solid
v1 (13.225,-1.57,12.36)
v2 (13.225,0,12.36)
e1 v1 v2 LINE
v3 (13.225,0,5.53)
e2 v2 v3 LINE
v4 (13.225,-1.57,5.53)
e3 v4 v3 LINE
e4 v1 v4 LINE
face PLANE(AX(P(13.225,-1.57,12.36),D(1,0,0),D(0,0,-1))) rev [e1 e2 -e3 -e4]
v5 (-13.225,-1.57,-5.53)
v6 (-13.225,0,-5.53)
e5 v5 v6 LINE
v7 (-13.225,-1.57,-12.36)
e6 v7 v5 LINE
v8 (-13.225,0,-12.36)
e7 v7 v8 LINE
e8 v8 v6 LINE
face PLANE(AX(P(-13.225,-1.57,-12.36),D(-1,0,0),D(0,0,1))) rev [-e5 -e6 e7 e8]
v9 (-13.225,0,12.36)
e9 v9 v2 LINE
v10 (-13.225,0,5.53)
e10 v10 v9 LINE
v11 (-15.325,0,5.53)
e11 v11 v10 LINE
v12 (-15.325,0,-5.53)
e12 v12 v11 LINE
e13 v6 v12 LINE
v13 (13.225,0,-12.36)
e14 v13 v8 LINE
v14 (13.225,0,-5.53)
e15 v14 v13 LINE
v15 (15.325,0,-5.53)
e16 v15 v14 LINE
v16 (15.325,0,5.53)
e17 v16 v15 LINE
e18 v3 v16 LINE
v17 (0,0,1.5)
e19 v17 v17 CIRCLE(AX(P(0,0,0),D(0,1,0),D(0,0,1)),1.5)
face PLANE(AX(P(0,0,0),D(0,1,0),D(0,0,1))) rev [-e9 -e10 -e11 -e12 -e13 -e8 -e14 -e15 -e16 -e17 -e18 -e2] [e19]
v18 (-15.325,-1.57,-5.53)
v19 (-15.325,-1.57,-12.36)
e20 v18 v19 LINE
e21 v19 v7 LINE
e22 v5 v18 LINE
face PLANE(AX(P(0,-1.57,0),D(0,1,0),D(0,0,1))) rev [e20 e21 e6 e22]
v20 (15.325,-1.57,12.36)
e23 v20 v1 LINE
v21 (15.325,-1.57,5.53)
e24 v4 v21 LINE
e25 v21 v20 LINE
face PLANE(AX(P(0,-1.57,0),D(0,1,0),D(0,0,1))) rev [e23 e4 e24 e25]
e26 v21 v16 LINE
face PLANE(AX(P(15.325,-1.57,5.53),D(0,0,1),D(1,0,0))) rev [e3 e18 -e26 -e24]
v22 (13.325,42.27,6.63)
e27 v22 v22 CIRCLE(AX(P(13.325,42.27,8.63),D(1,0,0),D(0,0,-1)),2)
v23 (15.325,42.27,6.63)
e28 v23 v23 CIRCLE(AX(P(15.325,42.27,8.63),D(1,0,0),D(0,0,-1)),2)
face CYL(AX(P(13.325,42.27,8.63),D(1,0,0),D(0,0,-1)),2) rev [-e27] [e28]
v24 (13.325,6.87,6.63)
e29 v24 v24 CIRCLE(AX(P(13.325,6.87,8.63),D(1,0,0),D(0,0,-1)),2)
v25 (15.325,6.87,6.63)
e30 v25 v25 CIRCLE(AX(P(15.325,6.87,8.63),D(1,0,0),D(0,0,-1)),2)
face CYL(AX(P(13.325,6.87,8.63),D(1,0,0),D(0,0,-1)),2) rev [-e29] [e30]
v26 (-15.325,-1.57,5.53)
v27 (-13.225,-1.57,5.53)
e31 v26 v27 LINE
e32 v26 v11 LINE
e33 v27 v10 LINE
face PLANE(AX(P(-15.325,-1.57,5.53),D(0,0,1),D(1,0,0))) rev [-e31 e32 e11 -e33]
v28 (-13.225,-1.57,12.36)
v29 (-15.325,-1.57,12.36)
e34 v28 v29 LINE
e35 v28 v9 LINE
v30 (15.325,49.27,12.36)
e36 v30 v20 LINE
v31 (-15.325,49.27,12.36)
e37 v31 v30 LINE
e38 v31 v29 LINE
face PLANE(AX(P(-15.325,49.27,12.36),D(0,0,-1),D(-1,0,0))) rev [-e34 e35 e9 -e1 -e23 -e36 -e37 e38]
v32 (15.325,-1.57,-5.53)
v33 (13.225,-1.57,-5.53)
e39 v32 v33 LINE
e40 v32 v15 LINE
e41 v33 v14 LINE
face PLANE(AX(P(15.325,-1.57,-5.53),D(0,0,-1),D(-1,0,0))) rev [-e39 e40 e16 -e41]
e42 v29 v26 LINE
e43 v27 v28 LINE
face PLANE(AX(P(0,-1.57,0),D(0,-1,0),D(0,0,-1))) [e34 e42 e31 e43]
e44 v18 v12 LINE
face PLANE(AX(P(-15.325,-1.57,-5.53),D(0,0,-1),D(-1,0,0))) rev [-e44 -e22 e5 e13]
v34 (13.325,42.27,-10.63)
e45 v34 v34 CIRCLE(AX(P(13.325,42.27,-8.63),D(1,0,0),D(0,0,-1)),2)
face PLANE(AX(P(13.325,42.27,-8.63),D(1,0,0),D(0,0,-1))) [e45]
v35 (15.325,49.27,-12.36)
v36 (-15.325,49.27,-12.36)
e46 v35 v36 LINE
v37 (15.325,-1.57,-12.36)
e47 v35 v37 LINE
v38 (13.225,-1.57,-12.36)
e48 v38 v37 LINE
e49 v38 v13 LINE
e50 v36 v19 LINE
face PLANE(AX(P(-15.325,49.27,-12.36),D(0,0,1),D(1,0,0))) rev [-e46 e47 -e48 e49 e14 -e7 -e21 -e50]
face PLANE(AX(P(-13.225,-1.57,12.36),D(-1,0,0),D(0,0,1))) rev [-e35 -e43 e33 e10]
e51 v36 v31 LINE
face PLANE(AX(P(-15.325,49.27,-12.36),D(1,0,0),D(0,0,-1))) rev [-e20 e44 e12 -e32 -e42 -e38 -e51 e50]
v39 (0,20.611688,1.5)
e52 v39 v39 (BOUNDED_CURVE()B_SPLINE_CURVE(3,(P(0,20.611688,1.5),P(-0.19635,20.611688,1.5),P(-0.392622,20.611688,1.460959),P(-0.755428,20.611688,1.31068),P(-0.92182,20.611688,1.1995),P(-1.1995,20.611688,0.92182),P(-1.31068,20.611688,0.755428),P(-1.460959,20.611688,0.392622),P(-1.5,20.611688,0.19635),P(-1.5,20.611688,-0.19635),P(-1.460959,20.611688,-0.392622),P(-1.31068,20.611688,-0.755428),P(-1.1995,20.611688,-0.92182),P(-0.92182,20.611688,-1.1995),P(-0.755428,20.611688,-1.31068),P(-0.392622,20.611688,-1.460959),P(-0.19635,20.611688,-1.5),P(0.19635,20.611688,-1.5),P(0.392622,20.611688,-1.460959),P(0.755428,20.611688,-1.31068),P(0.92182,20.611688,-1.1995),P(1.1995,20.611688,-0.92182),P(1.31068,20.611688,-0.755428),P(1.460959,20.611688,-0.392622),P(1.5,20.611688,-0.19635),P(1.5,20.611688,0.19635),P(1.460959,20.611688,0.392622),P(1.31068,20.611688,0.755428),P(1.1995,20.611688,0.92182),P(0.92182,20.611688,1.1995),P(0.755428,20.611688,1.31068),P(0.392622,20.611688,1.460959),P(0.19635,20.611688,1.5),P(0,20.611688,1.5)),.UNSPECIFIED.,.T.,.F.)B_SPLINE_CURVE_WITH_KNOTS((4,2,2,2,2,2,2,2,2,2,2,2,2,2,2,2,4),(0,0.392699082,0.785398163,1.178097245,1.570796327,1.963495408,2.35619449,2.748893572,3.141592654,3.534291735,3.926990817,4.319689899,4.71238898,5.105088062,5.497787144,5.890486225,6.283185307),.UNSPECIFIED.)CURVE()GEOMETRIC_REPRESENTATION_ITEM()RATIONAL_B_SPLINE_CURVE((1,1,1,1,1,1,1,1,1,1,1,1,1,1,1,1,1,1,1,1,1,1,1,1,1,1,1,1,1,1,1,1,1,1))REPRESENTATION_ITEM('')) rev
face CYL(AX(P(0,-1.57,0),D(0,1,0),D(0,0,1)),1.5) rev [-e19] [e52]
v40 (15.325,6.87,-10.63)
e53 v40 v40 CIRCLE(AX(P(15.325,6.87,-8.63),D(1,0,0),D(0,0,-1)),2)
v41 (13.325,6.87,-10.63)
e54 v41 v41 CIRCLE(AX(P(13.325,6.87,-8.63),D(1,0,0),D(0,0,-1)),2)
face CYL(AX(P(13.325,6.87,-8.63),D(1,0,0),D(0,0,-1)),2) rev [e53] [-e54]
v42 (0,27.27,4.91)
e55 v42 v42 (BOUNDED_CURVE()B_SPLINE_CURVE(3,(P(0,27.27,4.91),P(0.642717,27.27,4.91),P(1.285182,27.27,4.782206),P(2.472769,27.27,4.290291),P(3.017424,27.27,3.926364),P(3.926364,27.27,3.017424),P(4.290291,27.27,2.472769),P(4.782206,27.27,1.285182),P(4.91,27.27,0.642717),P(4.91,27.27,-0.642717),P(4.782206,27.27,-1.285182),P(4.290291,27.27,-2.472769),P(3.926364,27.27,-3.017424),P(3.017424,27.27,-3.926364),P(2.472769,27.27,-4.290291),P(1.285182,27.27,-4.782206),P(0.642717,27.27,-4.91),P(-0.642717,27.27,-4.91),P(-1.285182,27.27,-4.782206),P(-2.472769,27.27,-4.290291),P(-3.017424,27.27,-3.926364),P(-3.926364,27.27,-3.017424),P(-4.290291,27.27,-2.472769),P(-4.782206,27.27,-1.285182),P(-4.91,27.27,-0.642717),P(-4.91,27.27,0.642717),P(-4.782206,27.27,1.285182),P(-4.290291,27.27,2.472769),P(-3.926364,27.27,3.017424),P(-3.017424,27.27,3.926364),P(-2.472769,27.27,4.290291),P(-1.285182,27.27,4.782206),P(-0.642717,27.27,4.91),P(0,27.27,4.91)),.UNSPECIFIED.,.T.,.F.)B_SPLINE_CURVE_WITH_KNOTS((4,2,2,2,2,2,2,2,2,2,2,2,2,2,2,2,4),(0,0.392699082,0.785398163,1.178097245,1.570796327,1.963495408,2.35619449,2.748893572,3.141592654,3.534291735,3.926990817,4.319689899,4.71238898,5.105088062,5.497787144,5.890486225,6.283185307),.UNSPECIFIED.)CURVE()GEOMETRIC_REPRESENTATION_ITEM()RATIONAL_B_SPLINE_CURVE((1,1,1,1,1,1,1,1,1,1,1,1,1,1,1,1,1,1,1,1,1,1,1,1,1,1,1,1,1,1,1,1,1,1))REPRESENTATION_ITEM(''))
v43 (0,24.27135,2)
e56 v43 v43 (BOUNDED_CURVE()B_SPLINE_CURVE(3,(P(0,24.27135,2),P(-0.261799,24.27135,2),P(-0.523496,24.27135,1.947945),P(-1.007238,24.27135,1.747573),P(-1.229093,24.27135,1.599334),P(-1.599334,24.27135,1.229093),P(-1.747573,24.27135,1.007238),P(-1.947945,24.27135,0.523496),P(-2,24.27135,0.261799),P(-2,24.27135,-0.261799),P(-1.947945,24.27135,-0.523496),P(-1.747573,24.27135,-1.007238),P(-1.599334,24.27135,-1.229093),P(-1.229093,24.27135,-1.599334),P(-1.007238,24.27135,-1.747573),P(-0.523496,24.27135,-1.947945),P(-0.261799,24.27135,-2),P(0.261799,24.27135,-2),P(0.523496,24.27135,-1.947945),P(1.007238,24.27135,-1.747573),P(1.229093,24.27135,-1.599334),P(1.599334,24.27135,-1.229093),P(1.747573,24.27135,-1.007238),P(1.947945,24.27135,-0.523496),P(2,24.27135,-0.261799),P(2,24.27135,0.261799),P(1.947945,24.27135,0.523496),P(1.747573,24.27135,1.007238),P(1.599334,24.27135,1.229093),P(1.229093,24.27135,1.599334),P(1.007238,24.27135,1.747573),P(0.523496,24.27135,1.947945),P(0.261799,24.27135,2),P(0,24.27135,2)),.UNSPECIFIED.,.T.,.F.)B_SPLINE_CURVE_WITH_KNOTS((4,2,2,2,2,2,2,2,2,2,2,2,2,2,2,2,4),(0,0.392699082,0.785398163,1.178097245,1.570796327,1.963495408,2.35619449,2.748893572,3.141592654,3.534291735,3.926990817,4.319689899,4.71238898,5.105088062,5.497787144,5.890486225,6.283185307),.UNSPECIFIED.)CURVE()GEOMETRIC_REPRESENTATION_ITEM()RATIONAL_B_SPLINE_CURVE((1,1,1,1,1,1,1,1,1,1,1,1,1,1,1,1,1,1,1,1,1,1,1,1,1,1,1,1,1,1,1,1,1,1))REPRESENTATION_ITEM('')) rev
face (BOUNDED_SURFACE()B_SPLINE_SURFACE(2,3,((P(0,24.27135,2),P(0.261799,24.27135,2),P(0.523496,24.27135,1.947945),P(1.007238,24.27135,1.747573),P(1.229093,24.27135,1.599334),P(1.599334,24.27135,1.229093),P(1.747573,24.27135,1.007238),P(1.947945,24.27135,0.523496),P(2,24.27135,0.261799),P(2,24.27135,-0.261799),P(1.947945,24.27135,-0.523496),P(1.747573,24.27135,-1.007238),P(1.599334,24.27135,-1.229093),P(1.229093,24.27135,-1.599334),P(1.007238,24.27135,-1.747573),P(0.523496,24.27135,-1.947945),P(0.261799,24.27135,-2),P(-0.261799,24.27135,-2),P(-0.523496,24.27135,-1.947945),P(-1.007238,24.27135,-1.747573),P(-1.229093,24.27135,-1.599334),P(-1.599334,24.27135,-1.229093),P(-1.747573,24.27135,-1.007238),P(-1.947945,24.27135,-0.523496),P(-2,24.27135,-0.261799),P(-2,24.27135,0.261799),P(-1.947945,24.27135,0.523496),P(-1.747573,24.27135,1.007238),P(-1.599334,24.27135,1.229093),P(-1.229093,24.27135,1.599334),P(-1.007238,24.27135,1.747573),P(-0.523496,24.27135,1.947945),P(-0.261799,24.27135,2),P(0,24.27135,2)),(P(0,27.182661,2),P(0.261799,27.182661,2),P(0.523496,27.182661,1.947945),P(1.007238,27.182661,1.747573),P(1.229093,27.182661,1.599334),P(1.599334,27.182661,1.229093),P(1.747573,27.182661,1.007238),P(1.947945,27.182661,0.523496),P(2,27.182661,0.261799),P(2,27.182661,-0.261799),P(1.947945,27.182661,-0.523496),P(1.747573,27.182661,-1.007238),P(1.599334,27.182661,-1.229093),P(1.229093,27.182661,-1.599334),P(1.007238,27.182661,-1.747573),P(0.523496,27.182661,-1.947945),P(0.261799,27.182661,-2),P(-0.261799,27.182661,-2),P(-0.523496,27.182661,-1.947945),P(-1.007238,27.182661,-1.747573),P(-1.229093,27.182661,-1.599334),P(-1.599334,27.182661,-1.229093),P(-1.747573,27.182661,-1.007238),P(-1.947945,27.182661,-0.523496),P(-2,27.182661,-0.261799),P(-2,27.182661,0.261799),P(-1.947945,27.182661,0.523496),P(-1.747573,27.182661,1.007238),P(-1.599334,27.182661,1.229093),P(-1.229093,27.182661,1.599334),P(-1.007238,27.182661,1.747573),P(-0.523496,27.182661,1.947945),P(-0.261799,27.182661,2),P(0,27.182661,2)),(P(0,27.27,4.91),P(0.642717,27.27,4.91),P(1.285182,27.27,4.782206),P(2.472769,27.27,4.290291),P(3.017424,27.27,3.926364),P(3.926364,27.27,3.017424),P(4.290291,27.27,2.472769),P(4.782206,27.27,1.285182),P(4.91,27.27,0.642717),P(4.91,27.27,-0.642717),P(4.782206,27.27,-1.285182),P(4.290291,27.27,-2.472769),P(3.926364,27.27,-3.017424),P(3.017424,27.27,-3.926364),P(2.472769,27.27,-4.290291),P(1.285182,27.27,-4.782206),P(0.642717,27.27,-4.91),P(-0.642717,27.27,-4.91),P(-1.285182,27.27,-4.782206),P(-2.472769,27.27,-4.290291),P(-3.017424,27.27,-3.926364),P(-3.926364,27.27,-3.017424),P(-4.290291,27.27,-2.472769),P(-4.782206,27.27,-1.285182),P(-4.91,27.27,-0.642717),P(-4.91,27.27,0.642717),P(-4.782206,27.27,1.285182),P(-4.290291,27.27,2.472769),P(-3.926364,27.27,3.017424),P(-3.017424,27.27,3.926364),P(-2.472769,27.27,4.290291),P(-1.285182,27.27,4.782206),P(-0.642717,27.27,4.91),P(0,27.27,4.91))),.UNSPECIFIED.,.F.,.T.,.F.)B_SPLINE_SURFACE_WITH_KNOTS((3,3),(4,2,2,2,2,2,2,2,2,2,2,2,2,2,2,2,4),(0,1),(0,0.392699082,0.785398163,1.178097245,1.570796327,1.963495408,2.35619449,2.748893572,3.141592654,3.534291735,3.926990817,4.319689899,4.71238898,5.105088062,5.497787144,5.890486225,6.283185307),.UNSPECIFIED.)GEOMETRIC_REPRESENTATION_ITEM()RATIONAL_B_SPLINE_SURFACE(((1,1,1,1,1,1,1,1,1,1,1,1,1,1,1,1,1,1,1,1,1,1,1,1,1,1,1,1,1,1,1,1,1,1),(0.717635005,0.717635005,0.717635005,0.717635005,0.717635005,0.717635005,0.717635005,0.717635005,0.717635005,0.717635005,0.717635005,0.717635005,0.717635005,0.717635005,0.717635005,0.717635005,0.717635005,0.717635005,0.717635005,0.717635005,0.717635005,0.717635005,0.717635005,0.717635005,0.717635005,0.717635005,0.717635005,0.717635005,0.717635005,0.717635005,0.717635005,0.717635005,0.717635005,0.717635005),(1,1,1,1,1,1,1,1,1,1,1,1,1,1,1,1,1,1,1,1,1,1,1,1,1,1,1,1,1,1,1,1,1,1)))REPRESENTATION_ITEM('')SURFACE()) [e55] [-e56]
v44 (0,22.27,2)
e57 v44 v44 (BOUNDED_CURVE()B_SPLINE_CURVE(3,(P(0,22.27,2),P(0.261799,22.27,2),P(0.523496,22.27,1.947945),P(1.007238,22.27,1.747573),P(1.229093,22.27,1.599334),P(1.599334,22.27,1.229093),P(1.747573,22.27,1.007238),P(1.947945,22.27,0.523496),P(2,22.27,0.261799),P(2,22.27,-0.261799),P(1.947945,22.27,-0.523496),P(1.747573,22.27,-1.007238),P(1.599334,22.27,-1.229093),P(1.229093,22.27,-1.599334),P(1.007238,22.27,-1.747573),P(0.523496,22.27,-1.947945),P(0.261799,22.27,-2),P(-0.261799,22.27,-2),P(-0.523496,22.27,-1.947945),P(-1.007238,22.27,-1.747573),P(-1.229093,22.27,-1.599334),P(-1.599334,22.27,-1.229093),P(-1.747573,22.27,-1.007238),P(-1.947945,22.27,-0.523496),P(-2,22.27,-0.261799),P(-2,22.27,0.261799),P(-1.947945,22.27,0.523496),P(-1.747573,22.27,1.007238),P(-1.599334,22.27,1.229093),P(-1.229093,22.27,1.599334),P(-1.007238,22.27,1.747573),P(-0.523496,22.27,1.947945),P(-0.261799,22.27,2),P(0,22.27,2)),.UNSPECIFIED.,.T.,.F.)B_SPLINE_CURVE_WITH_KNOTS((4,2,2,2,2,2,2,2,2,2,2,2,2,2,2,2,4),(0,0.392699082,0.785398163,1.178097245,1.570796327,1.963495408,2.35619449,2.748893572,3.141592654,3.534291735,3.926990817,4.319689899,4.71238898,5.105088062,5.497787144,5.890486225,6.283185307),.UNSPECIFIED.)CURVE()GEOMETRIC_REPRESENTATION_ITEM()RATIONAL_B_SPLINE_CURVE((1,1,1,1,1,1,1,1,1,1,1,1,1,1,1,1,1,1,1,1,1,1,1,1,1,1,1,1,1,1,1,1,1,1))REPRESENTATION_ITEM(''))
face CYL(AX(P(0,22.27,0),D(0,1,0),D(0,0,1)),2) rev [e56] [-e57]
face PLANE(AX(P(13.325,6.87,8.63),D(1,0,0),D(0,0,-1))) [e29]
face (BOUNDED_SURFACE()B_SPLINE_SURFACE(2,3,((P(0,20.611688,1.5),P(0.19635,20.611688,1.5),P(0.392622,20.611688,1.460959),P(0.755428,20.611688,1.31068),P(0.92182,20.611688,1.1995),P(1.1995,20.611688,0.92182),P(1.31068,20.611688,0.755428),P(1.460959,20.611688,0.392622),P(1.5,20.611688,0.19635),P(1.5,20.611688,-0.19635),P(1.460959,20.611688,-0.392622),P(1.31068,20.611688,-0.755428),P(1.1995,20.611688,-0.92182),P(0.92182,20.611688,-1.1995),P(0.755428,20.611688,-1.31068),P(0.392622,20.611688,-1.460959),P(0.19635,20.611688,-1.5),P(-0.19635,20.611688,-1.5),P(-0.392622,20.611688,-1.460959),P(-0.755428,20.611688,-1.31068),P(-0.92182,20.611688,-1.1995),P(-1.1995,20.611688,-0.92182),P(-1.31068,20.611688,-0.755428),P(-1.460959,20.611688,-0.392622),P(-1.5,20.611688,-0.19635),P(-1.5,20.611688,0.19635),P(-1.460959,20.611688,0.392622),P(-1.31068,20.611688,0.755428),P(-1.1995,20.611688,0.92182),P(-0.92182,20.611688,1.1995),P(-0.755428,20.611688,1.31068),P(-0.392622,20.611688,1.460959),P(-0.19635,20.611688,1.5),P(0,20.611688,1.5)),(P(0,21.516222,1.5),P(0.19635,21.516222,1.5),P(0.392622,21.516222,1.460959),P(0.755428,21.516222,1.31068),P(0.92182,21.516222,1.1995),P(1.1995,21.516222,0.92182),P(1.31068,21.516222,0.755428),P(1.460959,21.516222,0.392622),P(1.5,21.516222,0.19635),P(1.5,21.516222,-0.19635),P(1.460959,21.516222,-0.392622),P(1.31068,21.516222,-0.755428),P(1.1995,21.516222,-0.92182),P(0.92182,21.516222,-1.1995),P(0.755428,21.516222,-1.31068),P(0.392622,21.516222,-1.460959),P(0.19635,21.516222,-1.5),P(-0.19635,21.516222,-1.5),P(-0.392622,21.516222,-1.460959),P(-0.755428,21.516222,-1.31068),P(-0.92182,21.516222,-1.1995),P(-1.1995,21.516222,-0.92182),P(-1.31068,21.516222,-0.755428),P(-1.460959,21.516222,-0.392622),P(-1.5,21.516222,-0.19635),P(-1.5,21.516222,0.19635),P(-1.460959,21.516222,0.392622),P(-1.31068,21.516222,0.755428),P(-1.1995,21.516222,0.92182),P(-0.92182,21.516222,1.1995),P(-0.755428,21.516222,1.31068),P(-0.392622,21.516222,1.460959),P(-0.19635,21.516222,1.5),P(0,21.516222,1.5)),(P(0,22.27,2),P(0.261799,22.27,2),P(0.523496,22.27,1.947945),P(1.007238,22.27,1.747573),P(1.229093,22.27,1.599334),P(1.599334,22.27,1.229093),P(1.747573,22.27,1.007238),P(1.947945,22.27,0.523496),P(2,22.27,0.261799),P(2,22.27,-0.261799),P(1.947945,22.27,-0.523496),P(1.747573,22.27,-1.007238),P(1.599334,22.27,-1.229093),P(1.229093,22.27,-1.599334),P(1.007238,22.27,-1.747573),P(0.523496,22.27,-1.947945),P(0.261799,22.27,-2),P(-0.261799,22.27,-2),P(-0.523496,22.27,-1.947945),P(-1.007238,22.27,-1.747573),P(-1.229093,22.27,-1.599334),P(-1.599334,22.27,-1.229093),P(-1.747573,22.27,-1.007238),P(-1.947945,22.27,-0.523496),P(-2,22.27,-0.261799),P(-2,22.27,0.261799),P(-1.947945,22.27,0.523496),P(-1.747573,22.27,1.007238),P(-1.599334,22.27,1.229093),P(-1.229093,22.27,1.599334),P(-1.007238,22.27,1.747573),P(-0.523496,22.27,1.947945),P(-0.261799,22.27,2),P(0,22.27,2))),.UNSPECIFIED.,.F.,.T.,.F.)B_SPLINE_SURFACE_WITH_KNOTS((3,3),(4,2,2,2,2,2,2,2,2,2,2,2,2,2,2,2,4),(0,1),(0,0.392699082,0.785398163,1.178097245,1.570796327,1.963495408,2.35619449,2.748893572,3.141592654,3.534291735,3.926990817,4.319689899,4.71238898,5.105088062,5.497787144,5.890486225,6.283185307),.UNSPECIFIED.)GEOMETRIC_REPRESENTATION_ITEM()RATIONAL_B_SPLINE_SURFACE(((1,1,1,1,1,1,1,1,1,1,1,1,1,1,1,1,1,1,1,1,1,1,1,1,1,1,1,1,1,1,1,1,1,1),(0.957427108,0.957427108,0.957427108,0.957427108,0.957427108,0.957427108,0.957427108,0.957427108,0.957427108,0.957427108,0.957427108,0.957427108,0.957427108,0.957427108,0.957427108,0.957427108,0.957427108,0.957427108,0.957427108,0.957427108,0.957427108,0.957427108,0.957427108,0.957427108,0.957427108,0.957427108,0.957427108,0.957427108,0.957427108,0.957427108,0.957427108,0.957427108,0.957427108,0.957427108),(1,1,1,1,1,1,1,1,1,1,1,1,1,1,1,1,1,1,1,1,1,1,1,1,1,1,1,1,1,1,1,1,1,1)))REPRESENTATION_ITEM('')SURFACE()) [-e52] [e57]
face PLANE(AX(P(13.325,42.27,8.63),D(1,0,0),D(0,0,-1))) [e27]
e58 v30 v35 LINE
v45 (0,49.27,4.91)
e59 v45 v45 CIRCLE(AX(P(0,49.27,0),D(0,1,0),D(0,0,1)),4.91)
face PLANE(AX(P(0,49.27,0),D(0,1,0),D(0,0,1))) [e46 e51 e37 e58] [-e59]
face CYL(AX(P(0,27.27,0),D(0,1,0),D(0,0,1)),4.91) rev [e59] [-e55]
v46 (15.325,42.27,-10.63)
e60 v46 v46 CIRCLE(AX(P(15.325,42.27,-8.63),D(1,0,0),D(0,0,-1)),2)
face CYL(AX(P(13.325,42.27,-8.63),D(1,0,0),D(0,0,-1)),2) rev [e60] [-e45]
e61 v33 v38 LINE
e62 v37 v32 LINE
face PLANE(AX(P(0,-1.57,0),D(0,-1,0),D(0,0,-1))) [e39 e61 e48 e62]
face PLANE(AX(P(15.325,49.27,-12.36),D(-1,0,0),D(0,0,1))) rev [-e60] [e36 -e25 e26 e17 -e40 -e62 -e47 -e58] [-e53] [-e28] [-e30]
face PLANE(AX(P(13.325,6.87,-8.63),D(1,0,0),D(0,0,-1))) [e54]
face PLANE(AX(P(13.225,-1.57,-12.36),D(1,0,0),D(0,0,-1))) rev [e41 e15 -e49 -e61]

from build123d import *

# Parameters (mm, degrees)
BOSS_EXTRUDE1_DEPTH = 49.27
SKETCH12_W          = 2.099999999999998
SKETCH12_H          = 6.83
SKETCH12_W_2        = 2.0999999999999996
SKETCH12_H_2        = 6.829999999999998
SKETCH12_W_3        = 2.1000000000000014
BOSS_EXTRUDE2_DEPTH = 1.57
SKETCH4_R           = 4.91
CUT_EXTRUDE3_DEPTH  = 22
SKETCH5_R           = 2
CUT_EXTRUDE4_DEPTH  = 5
SKETCH7_R           = 1.5
CUT_EXTRUDE5_DEPTH  = 34.41594267711148
FILLET4_R           = 3
FILLET5_R           = 3
SKETCH13_R          = 2.000000000000001
SKETCH13_R_2        = 2
SKETCH13_R_3        = 2.0000000000000004
SKETCH13_R_4        = 1.9999999999999996
CUT_EXTRUDE6_DEPTH  = 2


with BuildPart() as part:
    # Sketch2 → Boss-Extrude1 (new body)
    with BuildSketch(Plane(origin=(0, 0, 0), x_dir=(1, 0, 0), z_dir=(0, 1, 0))):
        Polygon((-15.325000000000001, 12.36), (15.324999999999998, 12.36), (15.325, -12.360000000000003), (-15.324999999999996, -12.360000000000003), align=None)
    extrude(amount=BOSS_EXTRUDE1_DEPTH)

    # Sketch12 → Boss-Extrude2 (add)
    with BuildSketch(Plane.XZ):
        with Locations((-14.274999999999997, 8.945000000000004)):
            Rectangle(SKETCH12_W, SKETCH12_H)
        with Locations((-14.275000000000002, -8.944999999999999)):
            Rectangle(SKETCH12_W_2, SKETCH12_H_2)
        with Locations((14.274999999999999, 8.945000000000004)):
            Rectangle(SKETCH12_W_3, SKETCH12_H)
        with Locations((14.274999999999999, -8.944999999999999)):
            Rectangle(SKETCH12_W_3, SKETCH12_H_2)
    extrude(amount=BOSS_EXTRUDE2_DEPTH)

    # Sketch4 → Cut-Extrude3 (cut)
    with BuildSketch(Plane(origin=(0, 49.27, 0), x_dir=(1, 0, 0), z_dir=(0, 1, 0))):
        with Locations(Location((0, 0, 0), (0, 0, 270))):
            Circle(SKETCH4_R)
    extrude(amount=-CUT_EXTRUDE3_DEPTH, mode=Mode.SUBTRACT)

    # Sketch5 → Cut-Extrude4 (cut)
    with BuildSketch(Plane(origin=(0, 27.270000000000003, 0), x_dir=(1, 0, 0), z_dir=(0, 1, 0))):
        with Locations(Location((0, 0, 0), (0, 0, 270))):
            Circle(SKETCH5_R)
    extrude(amount=-CUT_EXTRUDE4_DEPTH, mode=Mode.SUBTRACT)

    # Sketch7 → Cut-Extrude5 (cut, through all)
    with BuildSketch(Plane(origin=(0, 22.270000000000003, 0), x_dir=(1, 0, 0), z_dir=(0, 1, 0))):
        with Locations(Location((0, 0, 0), (0, 0, 270))):
            Circle(SKETCH7_R)
    extrude(amount=-CUT_EXTRUDE5_DEPTH, mode=Mode.SUBTRACT)

    # Fillet4
    # the kernel refuses this fillet: 3 mm, written as the material it takes off along each edge
    with BuildSketch(Plane(origin=(0, 27.270000000000003, 0), x_dir=(-1.8e-16, 0, 1), z_dir=(-1, 0, -1.8e-16))) as fillet4_piece_1:
        with BuildLine():
            CenterArc((5, -2.9986496961132367), FILLET4_R, 91.7191313208778, 88.2808686791222)
            Line((2, -2.9986496961132367), (1.94, -2.9986496961132367))
            Line((1.94, -2.9986496961132367), (1.94, 0))
            Line((1.94, 0), (2, 0.05999999999999872))
            ThreePointArc((2, 0.05999999999999872), (3.455, 0.05999999999999872), (4.9082, 0.05997299392226552))
            Line((4.9082, 0.05997299392226552), (4.91, 0))
        make_face()
    revolve(axis=Axis((0, 27.270000000000003, 0), (0, 1, 0)), mode=Mode.SUBTRACT)

    # Fillet5
    # the kernel refuses this fillet: 3 mm, written as the material it takes off along each edge
    with BuildSketch(Plane(origin=(0, 22.270000000000003, 0), x_dir=(-1.8e-16, 0, 1), z_dir=(-1, 0, -1.8e-16))) as fillet5_piece_1:
        with BuildLine():
            CenterArc((4.5, -1.6583123951831418), FILLET5_R, 146.44269023799268, 33.55730976200732)
            Line((2.0000000000025064, -1.66267e-12), (1.9500000000025566, 0.03316624790196698))
            ThreePointArc((1.9500000000025566, 0.03316624790196698), (1.7500000000012532, 0.05999999999999872), (1.5, 0.05999999999999872))
            Line((1.5, 0.05999999999999872), (1.44, 0))
            Line((1.44, 0), (1.44, -1.6583123951831418))
            Line((1.44, -1.6583123951831418), (1.5, -1.6583123951831418))
        make_face()
    revolve(axis=Axis((0, 22.270000000000003, 0), (0, 1, 0)), mode=Mode.SUBTRACT)

    # Sketch13 → Cut-Extrude6 (cut)
    with BuildSketch(Plane(origin=(15.324999999999998, 0, -1.08e-15), x_dir=(-7e-17, 0, -1), z_dir=(1, 0, -7e-17))):
        with Locations((-8.630000000000006, 42.27)):
            Circle(SKETCH13_R)
        with Locations((8.629999999999999, 42.27)):
            Circle(SKETCH13_R_2)
        with Locations((-8.630000000000006, 6.870000000000001)):
            Circle(SKETCH13_R_3)
        with Locations((8.629999999999999, 6.870000000000001)):
            Circle(SKETCH13_R_4)
    extrude(amount=-CUT_EXTRUDE6_DEPTH, mode=Mode.SUBTRACT)


solid = part.part
